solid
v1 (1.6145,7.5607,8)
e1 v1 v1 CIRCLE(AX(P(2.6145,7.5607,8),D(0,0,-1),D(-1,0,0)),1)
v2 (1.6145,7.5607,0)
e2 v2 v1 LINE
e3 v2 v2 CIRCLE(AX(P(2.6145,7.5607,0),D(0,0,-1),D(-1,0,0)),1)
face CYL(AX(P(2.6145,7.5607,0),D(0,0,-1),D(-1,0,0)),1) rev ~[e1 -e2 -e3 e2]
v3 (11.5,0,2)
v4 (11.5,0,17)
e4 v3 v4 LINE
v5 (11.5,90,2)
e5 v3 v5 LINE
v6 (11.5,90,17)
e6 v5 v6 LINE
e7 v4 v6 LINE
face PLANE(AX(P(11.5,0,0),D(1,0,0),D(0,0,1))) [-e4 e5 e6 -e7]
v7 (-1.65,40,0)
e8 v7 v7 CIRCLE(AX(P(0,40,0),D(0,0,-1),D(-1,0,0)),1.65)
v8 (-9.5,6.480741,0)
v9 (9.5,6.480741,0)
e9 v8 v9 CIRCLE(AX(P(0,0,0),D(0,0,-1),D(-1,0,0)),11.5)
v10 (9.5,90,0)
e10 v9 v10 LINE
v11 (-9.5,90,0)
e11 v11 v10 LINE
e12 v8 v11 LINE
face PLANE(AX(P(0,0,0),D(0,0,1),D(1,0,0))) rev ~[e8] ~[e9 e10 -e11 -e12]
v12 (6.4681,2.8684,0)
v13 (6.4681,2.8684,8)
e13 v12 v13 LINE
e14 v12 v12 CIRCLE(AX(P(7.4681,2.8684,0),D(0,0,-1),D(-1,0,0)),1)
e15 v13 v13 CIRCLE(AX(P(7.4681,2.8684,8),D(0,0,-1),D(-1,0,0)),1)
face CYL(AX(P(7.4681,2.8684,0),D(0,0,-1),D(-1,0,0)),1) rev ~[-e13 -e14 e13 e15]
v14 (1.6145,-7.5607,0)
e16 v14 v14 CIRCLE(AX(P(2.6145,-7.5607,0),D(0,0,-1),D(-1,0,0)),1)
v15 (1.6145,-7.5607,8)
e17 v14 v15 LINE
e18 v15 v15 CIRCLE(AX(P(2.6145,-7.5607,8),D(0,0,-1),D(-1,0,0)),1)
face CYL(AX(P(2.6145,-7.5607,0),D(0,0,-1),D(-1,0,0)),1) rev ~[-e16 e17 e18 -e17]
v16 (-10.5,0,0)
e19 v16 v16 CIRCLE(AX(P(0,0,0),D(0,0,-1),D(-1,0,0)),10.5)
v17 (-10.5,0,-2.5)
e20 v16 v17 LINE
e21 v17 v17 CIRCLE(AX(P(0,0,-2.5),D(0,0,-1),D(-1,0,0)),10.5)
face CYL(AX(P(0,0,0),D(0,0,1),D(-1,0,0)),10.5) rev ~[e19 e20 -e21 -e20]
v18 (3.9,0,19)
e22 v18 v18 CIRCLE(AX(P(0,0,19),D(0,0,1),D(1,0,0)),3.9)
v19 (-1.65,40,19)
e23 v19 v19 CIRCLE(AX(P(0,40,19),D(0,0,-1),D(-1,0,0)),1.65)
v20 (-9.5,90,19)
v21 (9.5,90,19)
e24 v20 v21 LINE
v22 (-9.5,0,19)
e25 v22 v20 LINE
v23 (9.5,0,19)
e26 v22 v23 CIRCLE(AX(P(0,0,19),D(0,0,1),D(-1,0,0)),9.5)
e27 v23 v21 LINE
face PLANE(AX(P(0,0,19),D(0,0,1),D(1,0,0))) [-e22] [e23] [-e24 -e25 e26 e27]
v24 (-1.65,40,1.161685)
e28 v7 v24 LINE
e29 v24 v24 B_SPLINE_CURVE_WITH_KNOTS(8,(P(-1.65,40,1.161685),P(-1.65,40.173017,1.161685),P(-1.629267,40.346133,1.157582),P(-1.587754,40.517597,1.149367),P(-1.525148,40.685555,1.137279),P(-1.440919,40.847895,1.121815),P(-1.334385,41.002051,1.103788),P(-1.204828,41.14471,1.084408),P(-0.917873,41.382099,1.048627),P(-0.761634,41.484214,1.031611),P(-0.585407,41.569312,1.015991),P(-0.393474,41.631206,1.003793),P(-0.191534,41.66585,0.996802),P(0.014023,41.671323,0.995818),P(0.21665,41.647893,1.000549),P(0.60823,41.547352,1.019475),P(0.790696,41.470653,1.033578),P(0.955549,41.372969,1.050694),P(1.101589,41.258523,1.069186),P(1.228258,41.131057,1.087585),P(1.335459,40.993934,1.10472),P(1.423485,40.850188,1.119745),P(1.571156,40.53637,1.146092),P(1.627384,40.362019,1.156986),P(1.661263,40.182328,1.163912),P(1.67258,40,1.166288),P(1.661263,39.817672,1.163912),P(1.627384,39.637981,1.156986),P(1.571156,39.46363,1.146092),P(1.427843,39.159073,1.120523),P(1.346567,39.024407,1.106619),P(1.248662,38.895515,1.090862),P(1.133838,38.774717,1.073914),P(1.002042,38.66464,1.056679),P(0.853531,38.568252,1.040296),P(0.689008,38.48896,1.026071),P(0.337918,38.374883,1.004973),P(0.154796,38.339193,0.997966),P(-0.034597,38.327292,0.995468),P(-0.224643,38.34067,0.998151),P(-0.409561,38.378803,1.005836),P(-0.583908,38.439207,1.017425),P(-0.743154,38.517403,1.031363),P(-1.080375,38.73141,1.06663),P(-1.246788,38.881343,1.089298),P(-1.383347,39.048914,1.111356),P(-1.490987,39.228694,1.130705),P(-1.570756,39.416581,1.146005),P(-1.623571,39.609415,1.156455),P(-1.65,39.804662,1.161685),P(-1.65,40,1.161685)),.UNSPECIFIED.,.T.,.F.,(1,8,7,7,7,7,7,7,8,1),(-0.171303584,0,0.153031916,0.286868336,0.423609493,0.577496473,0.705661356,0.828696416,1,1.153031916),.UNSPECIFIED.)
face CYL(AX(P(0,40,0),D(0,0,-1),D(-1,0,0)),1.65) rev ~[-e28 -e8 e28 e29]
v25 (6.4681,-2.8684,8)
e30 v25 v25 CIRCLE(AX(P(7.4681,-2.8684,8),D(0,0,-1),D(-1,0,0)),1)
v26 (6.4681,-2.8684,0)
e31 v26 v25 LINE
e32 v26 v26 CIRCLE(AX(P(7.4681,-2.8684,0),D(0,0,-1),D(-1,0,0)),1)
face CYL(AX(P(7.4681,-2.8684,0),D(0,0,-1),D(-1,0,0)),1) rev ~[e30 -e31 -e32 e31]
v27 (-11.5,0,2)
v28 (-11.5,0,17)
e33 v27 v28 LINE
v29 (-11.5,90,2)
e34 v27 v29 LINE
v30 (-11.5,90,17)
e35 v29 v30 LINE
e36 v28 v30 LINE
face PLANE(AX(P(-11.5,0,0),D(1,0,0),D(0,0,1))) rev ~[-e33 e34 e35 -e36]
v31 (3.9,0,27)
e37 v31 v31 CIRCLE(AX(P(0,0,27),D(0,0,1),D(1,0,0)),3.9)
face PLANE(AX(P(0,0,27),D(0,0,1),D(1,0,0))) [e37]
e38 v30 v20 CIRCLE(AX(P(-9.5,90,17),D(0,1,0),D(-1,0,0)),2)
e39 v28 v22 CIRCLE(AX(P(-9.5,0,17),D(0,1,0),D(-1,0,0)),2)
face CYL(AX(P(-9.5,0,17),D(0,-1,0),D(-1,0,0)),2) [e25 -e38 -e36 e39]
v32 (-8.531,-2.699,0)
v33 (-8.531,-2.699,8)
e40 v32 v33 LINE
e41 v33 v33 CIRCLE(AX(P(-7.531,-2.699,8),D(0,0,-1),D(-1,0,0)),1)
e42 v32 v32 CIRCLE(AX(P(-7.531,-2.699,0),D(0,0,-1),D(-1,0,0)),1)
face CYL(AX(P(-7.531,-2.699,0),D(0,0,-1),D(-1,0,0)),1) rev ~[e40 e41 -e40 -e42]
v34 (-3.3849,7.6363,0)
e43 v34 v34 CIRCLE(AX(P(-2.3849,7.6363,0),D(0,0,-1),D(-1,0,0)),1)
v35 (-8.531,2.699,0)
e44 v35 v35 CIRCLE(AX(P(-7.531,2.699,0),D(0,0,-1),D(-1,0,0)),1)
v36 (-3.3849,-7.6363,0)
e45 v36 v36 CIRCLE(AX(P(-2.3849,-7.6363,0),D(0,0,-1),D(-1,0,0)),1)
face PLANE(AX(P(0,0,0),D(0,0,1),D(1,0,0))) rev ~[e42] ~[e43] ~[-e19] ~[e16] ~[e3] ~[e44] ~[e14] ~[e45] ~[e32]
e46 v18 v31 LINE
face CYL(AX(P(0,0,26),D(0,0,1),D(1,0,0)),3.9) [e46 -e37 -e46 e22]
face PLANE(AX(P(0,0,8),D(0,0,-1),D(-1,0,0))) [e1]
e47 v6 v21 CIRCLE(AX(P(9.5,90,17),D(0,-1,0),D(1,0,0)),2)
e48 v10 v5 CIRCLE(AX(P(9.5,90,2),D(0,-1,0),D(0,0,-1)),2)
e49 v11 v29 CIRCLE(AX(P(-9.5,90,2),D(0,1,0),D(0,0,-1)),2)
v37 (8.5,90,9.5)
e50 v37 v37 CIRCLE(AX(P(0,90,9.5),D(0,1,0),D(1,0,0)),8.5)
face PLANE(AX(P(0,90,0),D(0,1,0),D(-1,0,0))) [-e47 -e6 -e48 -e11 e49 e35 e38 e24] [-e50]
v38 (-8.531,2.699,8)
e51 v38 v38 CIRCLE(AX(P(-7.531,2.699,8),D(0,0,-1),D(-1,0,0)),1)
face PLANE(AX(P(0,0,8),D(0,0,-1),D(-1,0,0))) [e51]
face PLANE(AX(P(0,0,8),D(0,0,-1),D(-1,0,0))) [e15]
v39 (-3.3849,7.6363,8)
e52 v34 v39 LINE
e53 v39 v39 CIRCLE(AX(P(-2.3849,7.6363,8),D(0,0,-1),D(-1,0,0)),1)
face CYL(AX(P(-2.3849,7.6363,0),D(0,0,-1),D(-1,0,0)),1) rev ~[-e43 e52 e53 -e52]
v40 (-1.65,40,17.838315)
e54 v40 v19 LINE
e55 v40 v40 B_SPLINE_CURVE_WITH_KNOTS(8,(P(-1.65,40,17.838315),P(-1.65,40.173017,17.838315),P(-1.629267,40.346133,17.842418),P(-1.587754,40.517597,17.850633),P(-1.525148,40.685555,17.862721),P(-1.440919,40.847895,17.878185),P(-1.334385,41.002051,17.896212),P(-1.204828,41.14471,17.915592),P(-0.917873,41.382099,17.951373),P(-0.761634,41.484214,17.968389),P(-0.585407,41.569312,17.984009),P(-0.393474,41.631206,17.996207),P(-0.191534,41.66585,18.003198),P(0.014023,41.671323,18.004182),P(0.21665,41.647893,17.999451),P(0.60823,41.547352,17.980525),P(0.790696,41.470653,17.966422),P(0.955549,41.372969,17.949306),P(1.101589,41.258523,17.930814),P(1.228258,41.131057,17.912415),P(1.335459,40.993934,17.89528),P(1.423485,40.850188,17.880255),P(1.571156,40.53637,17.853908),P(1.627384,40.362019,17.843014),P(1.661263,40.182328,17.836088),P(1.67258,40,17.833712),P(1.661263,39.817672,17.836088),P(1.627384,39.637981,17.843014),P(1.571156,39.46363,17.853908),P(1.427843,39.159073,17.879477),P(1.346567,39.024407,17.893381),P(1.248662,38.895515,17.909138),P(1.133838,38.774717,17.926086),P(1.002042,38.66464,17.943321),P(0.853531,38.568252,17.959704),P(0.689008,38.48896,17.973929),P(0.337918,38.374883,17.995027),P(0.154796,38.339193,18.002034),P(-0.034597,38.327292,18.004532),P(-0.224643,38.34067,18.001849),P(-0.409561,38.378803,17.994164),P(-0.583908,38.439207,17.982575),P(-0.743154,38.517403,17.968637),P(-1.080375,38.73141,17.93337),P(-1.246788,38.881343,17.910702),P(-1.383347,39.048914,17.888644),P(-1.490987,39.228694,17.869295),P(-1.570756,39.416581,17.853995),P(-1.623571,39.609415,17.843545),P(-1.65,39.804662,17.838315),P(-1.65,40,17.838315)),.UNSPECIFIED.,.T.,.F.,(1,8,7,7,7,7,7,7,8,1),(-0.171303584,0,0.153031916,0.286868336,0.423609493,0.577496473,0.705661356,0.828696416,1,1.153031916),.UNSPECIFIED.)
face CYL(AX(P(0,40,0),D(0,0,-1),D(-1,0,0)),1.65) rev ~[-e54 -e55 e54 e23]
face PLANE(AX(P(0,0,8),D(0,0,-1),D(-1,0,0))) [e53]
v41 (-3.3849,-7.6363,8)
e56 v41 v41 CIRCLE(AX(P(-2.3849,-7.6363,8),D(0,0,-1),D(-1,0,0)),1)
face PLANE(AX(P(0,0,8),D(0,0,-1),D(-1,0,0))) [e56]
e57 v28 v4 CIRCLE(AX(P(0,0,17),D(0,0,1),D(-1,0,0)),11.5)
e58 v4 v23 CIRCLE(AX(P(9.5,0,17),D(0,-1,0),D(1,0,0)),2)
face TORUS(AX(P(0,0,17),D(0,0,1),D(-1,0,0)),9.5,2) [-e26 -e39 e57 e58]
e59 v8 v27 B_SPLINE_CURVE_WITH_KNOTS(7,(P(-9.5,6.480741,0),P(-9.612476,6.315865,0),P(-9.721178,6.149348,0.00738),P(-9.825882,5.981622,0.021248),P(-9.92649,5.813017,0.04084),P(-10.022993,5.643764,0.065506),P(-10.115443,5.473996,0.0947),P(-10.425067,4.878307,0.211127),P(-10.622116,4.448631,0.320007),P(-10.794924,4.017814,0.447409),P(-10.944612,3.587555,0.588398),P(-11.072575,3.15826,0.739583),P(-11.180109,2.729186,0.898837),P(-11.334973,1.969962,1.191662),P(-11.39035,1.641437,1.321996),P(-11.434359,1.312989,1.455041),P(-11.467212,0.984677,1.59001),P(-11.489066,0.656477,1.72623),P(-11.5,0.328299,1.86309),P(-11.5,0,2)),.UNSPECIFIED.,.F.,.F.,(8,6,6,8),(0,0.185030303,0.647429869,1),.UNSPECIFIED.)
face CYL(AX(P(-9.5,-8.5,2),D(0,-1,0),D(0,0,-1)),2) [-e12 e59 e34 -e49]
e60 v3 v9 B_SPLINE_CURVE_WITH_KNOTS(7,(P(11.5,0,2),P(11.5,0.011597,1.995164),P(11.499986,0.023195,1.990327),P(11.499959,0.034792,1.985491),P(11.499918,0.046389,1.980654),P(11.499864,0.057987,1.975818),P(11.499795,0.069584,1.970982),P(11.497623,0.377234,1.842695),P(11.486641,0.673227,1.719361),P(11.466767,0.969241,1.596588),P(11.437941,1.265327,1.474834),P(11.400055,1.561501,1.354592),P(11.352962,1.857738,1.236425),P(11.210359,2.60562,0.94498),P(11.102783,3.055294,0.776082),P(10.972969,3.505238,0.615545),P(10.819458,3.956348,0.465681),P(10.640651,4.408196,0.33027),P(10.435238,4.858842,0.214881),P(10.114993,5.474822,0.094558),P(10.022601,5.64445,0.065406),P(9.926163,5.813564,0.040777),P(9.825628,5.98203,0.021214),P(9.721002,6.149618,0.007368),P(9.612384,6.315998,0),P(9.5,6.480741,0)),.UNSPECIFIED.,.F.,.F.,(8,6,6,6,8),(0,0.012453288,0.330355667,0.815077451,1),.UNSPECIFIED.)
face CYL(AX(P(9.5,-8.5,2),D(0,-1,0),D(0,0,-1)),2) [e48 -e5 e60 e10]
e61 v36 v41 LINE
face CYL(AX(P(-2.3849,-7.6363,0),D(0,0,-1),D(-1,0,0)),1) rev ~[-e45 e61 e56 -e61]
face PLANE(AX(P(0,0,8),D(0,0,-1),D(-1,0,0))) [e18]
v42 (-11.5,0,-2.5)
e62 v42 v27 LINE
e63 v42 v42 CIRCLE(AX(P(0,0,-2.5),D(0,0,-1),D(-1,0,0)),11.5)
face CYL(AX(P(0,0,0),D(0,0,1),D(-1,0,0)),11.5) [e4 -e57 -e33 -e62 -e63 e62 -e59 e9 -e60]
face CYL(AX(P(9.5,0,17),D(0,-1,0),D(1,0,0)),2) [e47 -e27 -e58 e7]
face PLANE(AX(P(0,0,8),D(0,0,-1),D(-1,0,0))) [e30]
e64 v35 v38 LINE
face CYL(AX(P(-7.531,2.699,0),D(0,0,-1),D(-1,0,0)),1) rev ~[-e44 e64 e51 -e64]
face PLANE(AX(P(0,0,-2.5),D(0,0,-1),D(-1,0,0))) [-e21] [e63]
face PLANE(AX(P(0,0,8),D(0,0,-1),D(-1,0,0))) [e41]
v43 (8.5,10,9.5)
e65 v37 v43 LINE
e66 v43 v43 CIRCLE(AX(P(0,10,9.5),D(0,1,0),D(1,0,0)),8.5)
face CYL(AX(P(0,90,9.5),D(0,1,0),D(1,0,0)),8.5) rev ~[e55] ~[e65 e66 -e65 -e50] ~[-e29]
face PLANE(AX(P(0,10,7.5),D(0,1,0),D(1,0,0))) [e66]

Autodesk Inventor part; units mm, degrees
ref_plane "YZ Plane" through (0, 0, 0) normal (1, 0, 0) x (0, 1, 0)
ref_plane "XZ Plane" through (0, 0, 0) normal (0, 1, 0) x (-1, 0, 0)
ref_plane "XY Plane" through (0, 0, 0) normal (0, 0, 1) x (1, 0, 0)
sketch "Sketch1" plane through (0, 0, 0) normal (0, 0, 1) x (1, 0, 0)
  circle A0 centre (0, 0) radius 11.5
  dimension "d0" = 23
extrude "Extrusion1" add sketch "Sketch1" along normal blind 26
sketch "Sketch2" plane through (0, 0, 0) normal (0, 1, 0) x (-1, 0, 0)
  line L0 (11.5, 0) -> (11.5, 26) projected
  line L1 (11.5, 26) -> (-11.5, 26) projected
  line L2 (11.5, 0) -> (-11.5, 0) projected
  line L3 (-11.5, 0) -> (-11.5, 26) projected
  line L4 (11.5, 0) -> (-11.5, 19) construction
  line L5 (-11.5, 0) -> (-11.5, 26) construction
  line L6 (-11.5, 0) -> (11.5, 19) construction
  line L7 (11.5, 0) -> (11.5, 26) construction
  line L8 (11.5, 19) -> (-11.5, 19) construction
  line L9 (11.5, 19) -> (-11.5, 19)
  line L10 (-11.5, 19) -> (-11.5, 0)
  line L11 (-11.5, 0) -> (11.5, 0)
  line L12 (11.5, 0) -> (11.5, 19)
  line L13 (11.5, 19) -> (-11.5, 0) construction
  line L14 (-11.5, 19) -> (11.5, 0) construction
  point P0 (0, 0)
  point P1 (11.5, 13)
  point P2 (0, 26)
  point P3 (0, 9.5)
  point P4 (0, 9.5)
  dimension "d15" = 7
extrude "Extrusion2" add sketch "Sketch2" along normal blind 90 contours L2 L3 L9 L0
sketch "Sketch3" plane through (0, 90, 7.5) normal (0, 1, 0) x (1, 0, 0)
  line L0 (-11.5, -11.5) -> (11.5, -11.5) construction
  line L1 (11.5, 7.5) -> (-11.5, 7.5) projected
  line L2 (11.5, -11.5) -> (11.5, 7.5) construction
  line L3 (-11.5, 7.5) -> (-11.5, -11.5) construction
  line L4 (-11.5, 7.5) -> (11.5, 7.5) construction
  circle A0 centre (0, -2) radius 8.5
  line L5 (11.5, -2) -> (-11.5, -2) construction
  line L6 (0, 7.5) -> (0, -11.5) construction
  dimension "d29" = 17
extrude "Extrusion3" cut sketch "Sketch3" against normal blind 80
sketch "Sketch4" plane through (0, 0, 26) normal (0, 0, 1) x (1, 0, 0)
  circle A0 centre (0, 0) radius 3.9
  circle A1 centre (0, 0) radius 11.5
  dimension "d10" = 7.8
  dimension "d11" = 23
extrude "Extrusion4" cut sketch "Sketch4" against normal blind 7
sketch "Sketch5" plane through (0, 0, 26) normal (0, 0, 1) x (1, 0, 0)
  circle A0 centre (0, 0) radius 3.9
  dimension "d18" = 7.8
extrude "Extrusion5" add sketch "Sketch5" along normal blind 1
sketch "Sketch7" plane through (0, 0, 0) normal (0, 0, -1) x (-1, 0, 0)
  circle A0 centre (0, 0) radius 8 construction
  circle A1 centre (-2.6145, 7.5607) radius 1
  circle A2 centre (2.3849, 7.6363) radius 1
  circle A3 centre (7.531, 2.699) radius 1
  circle A4 centre (7.531, -2.699) radius 1
  circle A5 centre (2.3849, -7.6363) radius 1
  circle A6 centre (-2.6145, -7.5607) radius 1
  circle A7 centre (-7.4681, -2.8684) radius 1
  circle A8 centre (-7.4681, 2.8684) radius 1
  dimension "d31" = 16
  dimension "d32" = 15
  dimension "d33" = 15
  dimension "d34" = 5
  dimension "d35" = 5
  dimension "d36" = 2
  dimension "d37" = 2
  dimension "d38" = 2
  dimension "d39" = 2
  dimension "d40" = 2
  dimension "d41" = 2
  dimension "d42" = 2
  dimension "d43" = 2
extrude "Extrusion7" cut sketch "Sketch7" against normal blind 8
sketch "Sketch8" plane through (0, 0, 0) normal (0, 0, -1) x (-1, 0, 0)
  circle A0 centre (0, 0) radius 11.5
  circle A1 centre (0, 0) radius 10.5
  dimension "d46" = 23
  dimension "d47" = 21
extrude "Extrusion8" add sketch "Sketch8" along normal blind 2.5
fillet "Fillet2" radius 2 5 edges at (0, -11.5, 19) (-11.5, 45, 19) (11.5, 45, 19) (11.5, 45, 0) (-11.5, 45, 0)
sketch "Sketch9" plane through (0, 0, 0) normal (0, 0, -1) x (-1, 0, 0)
  circle A0 centre (0, 40) radius 1.65
  line L0 (-9.5, 90) -> (9.5, 90) projected
  point P0 (0, 0)
  dimension "d51" = 3.3
  dimension "d52" = 50
extrude "Extrusion9" cut sketch "Sketch9" against normal through all
properties part number "stick_mount"
